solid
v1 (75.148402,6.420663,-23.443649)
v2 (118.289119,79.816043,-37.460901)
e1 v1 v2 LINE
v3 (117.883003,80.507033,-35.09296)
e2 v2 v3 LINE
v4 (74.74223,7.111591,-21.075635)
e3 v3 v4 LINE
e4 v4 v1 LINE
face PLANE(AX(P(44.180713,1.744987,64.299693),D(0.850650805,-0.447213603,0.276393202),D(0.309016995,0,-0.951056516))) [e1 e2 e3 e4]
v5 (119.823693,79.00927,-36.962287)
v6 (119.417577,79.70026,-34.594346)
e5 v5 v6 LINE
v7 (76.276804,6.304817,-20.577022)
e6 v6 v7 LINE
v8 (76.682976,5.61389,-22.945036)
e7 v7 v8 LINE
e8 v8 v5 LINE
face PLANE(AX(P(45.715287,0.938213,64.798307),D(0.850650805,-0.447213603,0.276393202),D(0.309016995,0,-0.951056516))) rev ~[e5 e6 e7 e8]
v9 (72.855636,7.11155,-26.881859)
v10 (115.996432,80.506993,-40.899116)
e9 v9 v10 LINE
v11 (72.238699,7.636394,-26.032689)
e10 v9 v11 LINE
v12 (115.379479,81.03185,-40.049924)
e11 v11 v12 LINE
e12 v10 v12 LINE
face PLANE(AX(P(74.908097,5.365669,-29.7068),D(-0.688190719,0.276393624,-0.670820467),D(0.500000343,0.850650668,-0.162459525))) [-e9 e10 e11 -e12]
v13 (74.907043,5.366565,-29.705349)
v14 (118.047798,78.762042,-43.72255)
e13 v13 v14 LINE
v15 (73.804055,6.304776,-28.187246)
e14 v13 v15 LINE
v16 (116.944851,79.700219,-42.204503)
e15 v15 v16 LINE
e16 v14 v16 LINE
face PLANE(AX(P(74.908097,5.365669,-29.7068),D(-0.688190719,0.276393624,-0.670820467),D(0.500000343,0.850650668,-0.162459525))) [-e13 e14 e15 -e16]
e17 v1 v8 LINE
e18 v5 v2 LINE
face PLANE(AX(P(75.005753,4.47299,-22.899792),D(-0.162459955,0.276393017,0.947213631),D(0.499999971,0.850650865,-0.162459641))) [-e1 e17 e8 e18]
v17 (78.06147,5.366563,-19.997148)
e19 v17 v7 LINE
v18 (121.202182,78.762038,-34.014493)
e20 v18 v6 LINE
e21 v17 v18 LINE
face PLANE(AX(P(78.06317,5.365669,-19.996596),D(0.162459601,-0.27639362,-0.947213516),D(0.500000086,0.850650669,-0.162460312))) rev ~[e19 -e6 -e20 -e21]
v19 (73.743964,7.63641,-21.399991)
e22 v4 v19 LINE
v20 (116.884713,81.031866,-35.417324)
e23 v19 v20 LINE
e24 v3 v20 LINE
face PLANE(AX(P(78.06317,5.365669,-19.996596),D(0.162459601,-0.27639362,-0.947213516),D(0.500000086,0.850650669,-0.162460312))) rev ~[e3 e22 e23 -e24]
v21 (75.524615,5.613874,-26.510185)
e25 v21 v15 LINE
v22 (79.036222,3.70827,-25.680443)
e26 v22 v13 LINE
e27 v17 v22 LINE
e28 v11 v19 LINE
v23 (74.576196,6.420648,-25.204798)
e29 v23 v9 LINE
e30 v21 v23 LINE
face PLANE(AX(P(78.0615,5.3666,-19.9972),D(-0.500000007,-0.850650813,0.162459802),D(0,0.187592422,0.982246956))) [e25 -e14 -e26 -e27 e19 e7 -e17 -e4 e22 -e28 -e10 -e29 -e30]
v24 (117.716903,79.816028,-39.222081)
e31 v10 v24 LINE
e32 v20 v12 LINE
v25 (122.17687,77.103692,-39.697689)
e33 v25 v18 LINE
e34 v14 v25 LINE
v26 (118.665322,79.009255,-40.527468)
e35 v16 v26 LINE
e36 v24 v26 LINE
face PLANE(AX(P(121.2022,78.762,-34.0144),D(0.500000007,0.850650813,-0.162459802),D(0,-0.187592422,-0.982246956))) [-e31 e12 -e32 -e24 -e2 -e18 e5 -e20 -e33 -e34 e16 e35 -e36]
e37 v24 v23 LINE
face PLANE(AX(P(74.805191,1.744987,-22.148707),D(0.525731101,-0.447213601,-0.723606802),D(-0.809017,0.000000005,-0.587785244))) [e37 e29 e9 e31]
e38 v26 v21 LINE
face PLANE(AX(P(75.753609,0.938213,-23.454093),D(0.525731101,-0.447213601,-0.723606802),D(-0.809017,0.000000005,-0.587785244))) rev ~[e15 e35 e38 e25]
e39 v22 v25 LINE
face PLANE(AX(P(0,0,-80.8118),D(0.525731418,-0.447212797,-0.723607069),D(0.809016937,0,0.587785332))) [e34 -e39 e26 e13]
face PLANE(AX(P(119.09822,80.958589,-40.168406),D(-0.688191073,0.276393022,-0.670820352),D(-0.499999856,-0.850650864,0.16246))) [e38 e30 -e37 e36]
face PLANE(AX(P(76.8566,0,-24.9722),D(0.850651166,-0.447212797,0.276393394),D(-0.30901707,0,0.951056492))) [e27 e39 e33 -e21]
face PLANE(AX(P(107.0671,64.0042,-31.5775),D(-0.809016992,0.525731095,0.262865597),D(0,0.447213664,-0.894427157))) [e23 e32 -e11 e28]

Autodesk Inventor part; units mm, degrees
sketch "Boceto1" plane through (0, 0, 0) normal (0, 1, 0) x (-1, 0, 0)
  line L0 (47.5, 65.3781) -> (76.8566, -24.9722)
  line L1 (76.8566, -24.9722) -> (0, -80.8118)
  line L2 (0, -80.8118) -> (-76.8566, -24.9722)
  line L3 (-76.8566, -24.9722) -> (-47.5, 65.3781)
  line L4 (-47.5, 65.3781) -> (47.5, 65.3781)
  line L5 (0, 0) -> (130.7563, 0) construction
  line L6 (130.7563, 0) -> (130.7563, 130.7563) construction
  line L7 (130.7563, 130.7563) -> (0, 130.7563) construction
  line L8 (0, 130.7563) -> (0, 0) construction
  line L9 (130.7563, 130.7563) -> (0, 65.3781)
  dimension "d0" = 95
  dimension "d1" = 211.5681
  dimension "d2" = 26.565
extrude "Extrusión1" add sketch "Boceto1" along normal blind 211.5681 draft 26.565
sketch "Boceto2" plane through (0, 211.5681, 0) normal (0, 1, 0) x (1, 0, 0)
  line L0 (0, -80.8118) -> (-76.8566, -24.9722)
  line L1 (-76.8566, -24.9722) -> (-47.5, 65.3781)
  line L2 (-47.5, 65.3781) -> (47.5, 65.3781)
  line L3 (47.5, 65.3781) -> (76.8566, -24.9722)
  line L4 (76.8566, -24.9722) -> (0, -80.8118)
  point P0 (0, 0)
  point P1 (0, 0)
  dimension "L" = 95
extrude "Extrusión2" cut sketch "Boceto2" against normal blind 211.5681 draft 26.565 keep common part
sketch "Boceto3" plane through (47.5, 0, 65.3781) normal (0.8506508, -0.4472136, 0.2763932) x (0.309017, 0, -0.9510565)
  line L0 (47.5, 146.19) -> (124.3566, 90.3504) projected
  line L1 (-29.3566, 90.3504) -> (47.5, 146.19) projected
  line L2 (0, 0) -> (-29.3566, 90.3504) projected
  line L3 (0, 0) -> (95, 0) projected
  line L4 (95, 0) -> (124.3566, 90.3504) projected
  line L5 (117.3032, 88.0586) -> (47.5, 138.7736)
  line L6 (47.5, 138.7736) -> (-22.3032, 88.0586)
  line L7 (-22.3032, 88.0586) -> (4.3593, 6)
  line L8 (4.3593, 6) -> (90.6407, 6)
  line L9 (90.6407, 6) -> (117.3032, 88.0586)
  point P0 (47.5, -29.238)
  dimension "D" = 6
extrude "Extrusión3" cut sketch "Boceto3" against normal blind 111.5681 contours L9 L8 L7 L6 L5
sketch "Boceto4" plane through (76.8566, 0, -24.9722) normal (0.5257311, -0.4472136, -0.7236068) x (-0.809017, 0, -0.5877853)
  line L0 (47.5, 146.19) -> (124.3566, 90.3504) projected
  line L1 (-29.3566, 90.3504) -> (47.5, 146.19) projected
  line L2 (0, 0) -> (-29.3566, 90.3504) projected
  line L3 (0, 0) -> (95, 0) projected
  line L4 (95, 0) -> (124.3566, 90.3504) projected
  line L5 (90.6407, 6) -> (4.3593, 6)
  line L6 (4.3593, 6) -> (-22.3032, 88.0586)
  line L7 (-22.3032, 88.0586) -> (47.5, 138.7736)
  line L8 (47.5, 138.7736) -> (117.3032, 88.0586)
  line L9 (117.3032, 88.0586) -> (90.6407, 6)
  point P0 (47.5, -29.238)
  dimension "d14" = 6
extrude "Extrusión4" cut sketch "Boceto4" against normal blind 111.5681 contours L5 L6 L7 L8 L9
sketch "Boceto5" plane through (0, 0, 0) normal (0, -1, 0) x (1, 0, 0)
  line L0 (76.8566, -24.9722) -> (0, -80.8118) projected
  line L1 (47.5, 65.3781) -> (76.8566, -24.9722) projected
  line L2 (-47.5, 65.3781) -> (47.5, 65.3781) projected
  line L3 (-76.8566, -24.9722) -> (-47.5, 65.3781) projected
  line L4 (0, -80.8118) -> (-76.8566, -24.9722) projected
  line L5 (43.1407, 59.3781) -> (69.8032, -22.6804)
  line L6 (69.8032, -22.6804) -> (0, -73.3954)
  line L7 (0, -73.3954) -> (-69.8032, -22.6804)
  line L8 (-69.8032, -22.6804) -> (-43.1407, 59.3781)
  line L9 (-43.1407, 59.3781) -> (43.1407, 59.3781)
  point P0 (0, 0)
  dimension "d17" = 6
extrude "Extrusión5" cut sketch "Boceto5" against normal blind 111.5681 contours L5 L6 L7 L8 L9
sketch "Boceto6" plane through (47.5, 211.5681, -65.3781) normal (0, 0.4472136, -0.8944272) x (-1, 0, 0)
  line L0 (47.5, -146.19) -> (124.3566, -90.3504) projected
  line L1 (95, 0) -> (124.3566, -90.3504) projected
  line L2 (95, 0) -> (0, 0) projected
  line L3 (0, 0) -> (-29.3566, -90.3504) projected
  line L4 (-29.3566, -90.3504) -> (47.5, -146.19) projected
  line L5 (117.3032, -88.0586) -> (47.5, -138.7736)
  line L6 (47.5, -138.7736) -> (-22.3032, -88.0586)
  line L7 (-22.3032, -88.0586) -> (4.3593, -6)
  line L8 (4.3593, -6) -> (90.6407, -6)
  line L9 (90.6407, -6) -> (117.3032, -88.0586)
  point P0 (47.5, -159.9943)
  dimension "d20" = 6
extrude "Extrusión6" cut sketch "Boceto6" against normal blind 111.5681 contours L5 L6 L7 L8 L9
sketch "Boceto7" plane through (0, 0, -80.8118) normal (-0.5257311, -0.4472136, -0.7236068) x (-0.809017, 0, 0.5877853)
  line L0 (47.5, 146.19) -> (124.3566, 90.3504) projected
  line L1 (-29.3566, 90.3504) -> (47.5, 146.19) projected
  line L2 (0, 0) -> (-29.3566, 90.3504) projected
  line L3 (0, 0) -> (95, 0) projected
  line L4 (95, 0) -> (124.3566, 90.3504) projected
  line L5 (117.3032, 88.0586) -> (47.5, 138.7736)
  line L6 (47.5, 138.7736) -> (-22.3032, 88.0586)
  line L7 (-22.3032, 88.0586) -> (4.3593, 6)
  line L8 (4.3593, 6) -> (90.6407, 6)
  line L9 (90.6407, 6) -> (117.3032, 88.0586)
  point P0 (47.5, -29.238)
  dimension "d23" = 6
extrude "Extrusión7" cut sketch "Boceto7" against normal blind 111.5681 contours L9 L8 L7 L6 L5
sketch "Boceto8" plane through (76.8566, 211.5681, 24.9722) normal (0.8506508, 0.4472136, -0.2763932) x (-0.309017, 0, -0.9510565)
  line L0 (47.5, -146.19) -> (124.3566, -90.3504) projected
  line L1 (95, 0) -> (124.3566, -90.3504) projected
  line L2 (95, 0) -> (0, 0) projected
  line L3 (0, 0) -> (-29.3566, -90.3504) projected
  line L4 (-29.3566, -90.3504) -> (47.5, -146.19) projected
  line L5 (47.5, -138.7736) -> (117.3032, -88.0586)
  line L6 (117.3032, -88.0586) -> (90.6407, -6)
  line L7 (90.6407, -6) -> (4.3593, -6)
  line L8 (4.3593, -6) -> (-22.3032, -88.0586)
  line L9 (-22.3032, -88.0586) -> (47.5, -138.7736)
  point P0 (47.5, -159.9943)
  dimension "d26" = 6
extrude "Extrusión8" cut sketch "Boceto8" against normal blind 111.5681 contours L9 L8 L7 L6 L5
sketch "Boceto9" plane through (0, 211.5681, 0) normal (0, 1, 0) x (1, 0, 0)
  line L0 (78.0615, -19.9972) -> (-16.844, -50.8338) projected
  line L1 (-47.5, 65.3781) -> (47.5, 65.3781) projected
  line L2 (-76.8566, -24.9722) -> (-47.5, 65.3781) projected
  line L3 (0, -80.8118) -> (-76.8566, -24.9722) projected
  line L4 (76.8566, -24.9722) -> (0, -80.8118) projected
  line L5 (47.5, 65.3781) -> (76.8566, -24.9722) projected
  line L6 (0, -73.3954) -> (-69.8032, -22.6804)
  line L7 (-69.8032, -22.6804) -> (-43.1407, 59.3781)
  line L8 (-43.1407, 59.3781) -> (43.1407, 59.3781)
  line L9 (43.1407, 59.3781) -> (69.8032, -22.6804)
  line L10 (69.8032, -22.6804) -> (0, -73.3954)
  point P0 (0, 0)
  dimension "d29" = 6
extrude "Extrusión9" cut sketch "Boceto9" against normal blind 111.5681 contours L6 L7 L8 L9 L10
sketch "Boceto10" plane through (-47.5, 211.5681, -65.3781) normal (-0.8506508, 0.4472136, -0.2763932) x (-0.309017, 0, 0.9510565)
  line L0 (-29.3566, -90.3504) -> (47.5, -146.19) projected
  line L1 (47.5, -146.19) -> (124.3566, -90.3504) projected
  line L2 (95, 0) -> (124.3566, -90.3504) projected
  line L3 (95, 0) -> (0, 0) projected
  line L4 (0, 0) -> (-29.3566, -90.3504) projected
  line L5 (117.3032, -88.0586) -> (47.5, -138.7736)
  line L6 (47.5, -138.7736) -> (-22.3032, -88.0586)
  line L7 (-22.3032, -88.0586) -> (4.3593, -6)
  line L8 (4.3593, -6) -> (90.6407, -6)
  line L9 (90.6407, -6) -> (117.3032, -88.0586)
  point P0 (47.5, -159.9943)
  dimension "d32" = 6
extrude "Extrusión10" cut sketch "Boceto10" against normal blind 111.5681 contours L5 L6 L7 L8 L9
sketch "Boceto11" plane through (-76.8566, 0, -24.9722) normal (-0.8506508, -0.4472136, 0.2763932) x (0.309017, 0, 0.9510565)
  line L0 (47.5, 65.3781) -> (90.6407, 79.3954) projected
  line L1 (-29.3566, 90.3504) -> (47.5, 146.19) projected
  line L2 (0, 0) -> (-29.3566, 90.3504) projected
  line L3 (0, 0) -> (95, 0) projected
  line L4 (95, 0) -> (124.3566, 90.3504) projected
  line L5 (47.5, 146.19) -> (124.3566, 90.3504) projected
  line L6 (117.3032, 88.0586) -> (90.6407, 6)
  line L7 (90.6407, 6) -> (4.3593, 6)
  line L8 (4.3593, 6) -> (-22.3032, 88.0586)
  line L9 (-22.3032, 88.0586) -> (47.5, 138.7736)
  line L10 (47.5, 138.7736) -> (117.3032, 88.0586)
  point P0 (47.5, -29.238)
  dimension "d35" = 6
extrude "Extrusión11" cut sketch "Boceto11" against normal blind 111.5681 contours L6 L7 L8 L9 L10
sketch "Boceto12" plane through (-47.5, 0, 65.3781) normal (0, -0.4472136, 0.8944272) x (1, 0, 0)
  line L0 (4.3593, 6) -> (47.5, 65.3781) projected
  line L1 (-29.3566, 90.3504) -> (47.5, 146.19) projected
  line L2 (0, 0) -> (-29.3566, 90.3504) projected
  line L3 (0, 0) -> (95, 0) projected
  line L4 (95, 0) -> (124.3566, 90.3504) projected
  line L5 (47.5, 146.19) -> (124.3566, 90.3504) projected
  line L6 (117.3032, 88.0586) -> (90.6407, 6)
  line L7 (90.6407, 6) -> (4.3593, 6)
  line L8 (4.3593, 6) -> (-22.3032, 88.0586)
  line L9 (-22.3032, 88.0586) -> (47.5, 138.7736)
  line L10 (47.5, 138.7736) -> (117.3032, 88.0586)
  point P0 (47.5, -29.238)
  dimension "d38" = 6
extrude "Extrusión12" cut sketch "Boceto12" against normal blind 111.5681 contours L6 L7 L8 L9 L10
sketch "Boceto13" plane through (0, 211.5681, 80.8118) normal (0.5257311, 0.4472136, 0.7236068) x (0.809017, 0, -0.5877853)
  line L0 (-29.3566, -90.3504) -> (47.5, -146.19) projected
  line L1 (47.5, -146.19) -> (124.3566, -90.3504) projected
  line L2 (95, 0) -> (124.3566, -90.3504) projected
  line L3 (95, 0) -> (0, 0) projected
  line L4 (0, 0) -> (-29.3566, -90.3504) projected
  line L5 (47.5, -138.7736) -> (-22.3032, -88.0586)
  line L6 (-22.3032, -88.0586) -> (4.3593, -6)
  line L7 (4.3593, -6) -> (90.6407, -6)
  line L8 (90.6407, -6) -> (117.3032, -88.0586)
  line L9 (117.3032, -88.0586) -> (47.5, -138.7736)
  point P0 (47.5, -159.9943)
  dimension "d41" = 6
extrude "Extrusión13" cut sketch "Boceto13" against normal blind 111.5681 contours L5 L6 L7 L8 L9
sketch "Boceto14" plane through (-76.8566, 211.5681, 24.9722) normal (-0.5257311, 0.4472136, 0.7236068) x (0.809017, 0, 0.5877853)
  line L0 (-29.3566, -90.3504) -> (47.5, -146.19) projected
  line L1 (47.5, -146.19) -> (124.3566, -90.3504) projected
  line L2 (95, 0) -> (124.3566, -90.3504) projected
  line L3 (95, 0) -> (0, 0) projected
  line L4 (0, 0) -> (-29.3566, -90.3504) projected
  line L5 (-22.3032, -88.0586) -> (47.5, -138.7736)
  line L6 (47.5, -138.7736) -> (117.3032, -88.0586)
  line L7 (117.3032, -88.0586) -> (90.6407, -6)
  line L8 (90.6407, -6) -> (4.3593, -6)
  line L9 (4.3593, -6) -> (-22.3032, -88.0586)
  point P0 (47.5, -159.9943)
  dimension "d44" = 6
extrude "Extrusión14" cut sketch "Boceto14" against normal blind 111.5681 contours L9 L8 L7 L6 L5
ref_plane "Plano de trabajo1" through (47.5, 210.2265, -62.6949) normal (0, 0.4472136, -0.8944272) x (-1, 0, 0)
sketch "Boceto15" plane through (47.5, 210.2265, -62.6949) normal (0, 0.4472136, -0.8944272) x (-1, 0, 0)
  line L0 (4.3593, -6) -> (90.6407, -6) projected
  line L1 (-22.3032, -88.0586) -> (4.3593, -6) projected
  line L2 (47.5, -138.7736) -> (-22.3032, -88.0586) projected
  line L3 (117.3032, -88.0586) -> (47.5, -138.7736) projected
  line L4 (90.6407, -6) -> (117.3032, -88.0586) projected
  line L5 (2.5429, -3.5) -> (92.4571, -3.5)
  line L6 (92.4571, -3.5) -> (120.2421, -89.0135)
  line L7 (120.2421, -89.0135) -> (47.5, -141.8637)
  line L8 (47.5, -141.8637) -> (-25.2421, -89.0135)
  line L9 (-25.2421, -89.0135) -> (2.5429, -3.5)
  point P0 (47.5, -159.9943)
  dimension "D2" = 2.5
extrude "Extrusión15" cut sketch "Boceto15" along normal mid plane 1.8 contours L0 L4 L3 L2 L1 | L5 L6 L7 L8 L9
ref_plane "Plano de trabajo2" through (75.2794, 1.3416, -22.8014) normal (0.5257311, -0.4472136, -0.7236068) x (-0.809017, 0, -0.5877853)
sketch "Boceto16" plane through (75.2794, 1.3416, -22.8014) normal (0.5257311, -0.4472136, -0.7236068) x (-0.809017, 0, -0.5877853)
  line L0 (90.6407, 6) -> (4.3593, 6) projected
  line L1 (117.3032, 88.0586) -> (90.6407, 6) projected
  line L2 (47.5, 138.7736) -> (117.3032, 88.0586) projected
  line L3 (-22.3032, 88.0586) -> (47.5, 138.7736) projected
  line L4 (4.3593, 6) -> (-22.3032, 88.0586) projected
  line L5 (2.5429, 3.5) -> (92.4571, 3.5)
  line L6 (92.4571, 3.5) -> (120.2421, 89.0135)
  line L7 (120.2421, 89.0135) -> (47.5, 141.8637)
  line L8 (47.5, 141.8637) -> (-25.2421, 89.0135)
  line L9 (-25.2421, 89.0135) -> (2.5429, 3.5)
  point P0 (47.5, -29.238)
  dimension "d52" = 2.5
extrude "Extrusión16" cut sketch "Boceto16" along normal mid plane 1.8
ref_plane "Plano de trabajo3" through (74.3047, 210.2265, 25.8014) normal (0.8506508, 0.4472136, -0.2763932) x (-0.309017, 0, -0.9510565)
sketch "Boceto17" plane through (74.3047, 210.2265, 25.8014) normal (0.8506508, 0.4472136, -0.2763932) x (-0.309017, 0, -0.9510565)
  line L0 (47.5, -138.7736) -> (-22.3032, -88.0586) projected
  line L1 (117.3032, -88.0586) -> (47.5, -138.7736) projected
  line L2 (90.6407, -6) -> (117.3032, -88.0586) projected
  line L3 (4.3593, -6) -> (90.6407, -6) projected
  line L4 (-22.3032, -88.0586) -> (4.3593, -6) projected
  line L5 (-25.2421, -89.0135) -> (47.5, -141.8637)
  line L6 (47.5, -141.8637) -> (120.2421, -89.0135)
  line L7 (120.2421, -89.0135) -> (92.4571, -3.5)
  line L8 (92.4571, -3.5) -> (2.5429, -3.5)
  line L9 (2.5429, -3.5) -> (-25.2421, -89.0135)
  point P0 (47.5, -159.9943)
  dimension "d56" = 2.5
extrude "Extrusión17" cut sketch "Boceto17" along normal mid plane 1.8
ref_plane "Plano de trabajo4" through (1.5772, 1.3416, -78.641) normal (-0.5257311, -0.4472136, -0.7236068) x (-0.809017, 0, 0.5877853)
sketch "Boceto18" plane through (1.5772, 1.3416, -78.641) normal (-0.5257311, -0.4472136, -0.7236068) x (-0.809017, 0, 0.5877853)
  line L0 (117.3032, 88.0586) -> (90.6407, 6) projected
  line L1 (47.5, 138.7736) -> (117.3032, 88.0586) projected
  line L2 (-22.3032, 88.0586) -> (47.5, 138.7736) projected
  line L3 (4.3593, 6) -> (-22.3032, 88.0586) projected
  line L4 (90.6407, 6) -> (4.3593, 6) projected
  line L5 (92.4571, 3.5) -> (120.2421, 89.0135)
  line L6 (120.2421, 89.0135) -> (47.5, 141.8637)
  line L7 (47.5, 141.8637) -> (-25.2421, 89.0135)
  line L8 (-25.2421, 89.0135) -> (2.5429, 3.5)
  line L9 (2.5429, 3.5) -> (92.4571, 3.5)
  point P0 (47.5, -29.238)
  dimension "d60" = 2.5
extrude "Extrusión18" cut sketch "Boceto18" along normal mid plane 1.8 contours L0 L4 L3 L2 L1 | L9 L8 L7 L6 L5
ref_plane "Plano de trabajo5" through (0, 3, 0) normal (0, -1, 0) x (1, 0, 0)
sketch "Boceto19" plane through (0, 3, 0) normal (0, -1, 0) x (1, 0, 0)
  line L0 (0, -73.3954) -> (-69.8032, -22.6804) projected
  line L1 (-69.8032, -22.6804) -> (-43.1407, 59.3781) projected
  line L2 (-43.1407, 59.3781) -> (43.1407, 59.3781) projected
  line L3 (43.1407, 59.3781) -> (69.8032, -22.6804) projected
  line L4 (69.8032, -22.6804) -> (0, -73.3954) projected
  line L5 (76.8566, -24.9722) -> (0, -80.8118) projected
  line L6 (47.5, 65.3781) -> (76.8566, -24.9722) projected
  line L7 (-47.5, 65.3781) -> (47.5, 65.3781) projected
  line L8 (-76.8566, -24.9722) -> (-47.5, 65.3781) projected
  line L9 (0, -80.8118) -> (-76.8566, -24.9722) projected
  line L10 (-44.9571, 61.8781) -> (-72.7421, -23.6353)
  line L11 (-72.7421, -23.6353) -> (0, -76.4856)
  line L12 (0, -76.4856) -> (72.7421, -23.6353)
  line L13 (72.7421, -23.6353) -> (44.9571, 61.8781)
  line L14 (44.9571, 61.8781) -> (-44.9571, 61.8781)
  point P0 (0, 0)
  dimension "d64" = 2.5
extrude "Extrusión19" cut sketch "Boceto19" along normal mid plane 1.8 contours L0 L1 L2 L3 L4 | L14 L13 L12 L11 L10
ref_plane "Plano de trabajo6" through (44.948, 1.3416, 64.549) normal (0.8506508, -0.4472136, 0.2763932) x (0.309017, 0, -0.9510565)
sketch "Boceto20" plane through (44.948, 1.3416, 64.549) normal (0.8506508, -0.4472136, 0.2763932) x (0.309017, 0, -0.9510565)
  line L0 (4.3593, 6) -> (-22.3032, 88.0586) projected
  line L1 (-22.3032, 88.0586) -> (47.5, 138.7736) projected
  line L2 (47.5, 138.7736) -> (117.3032, 88.0586) projected
  line L3 (117.3032, 88.0586) -> (90.6407, 6) projected
  line L4 (90.6407, 6) -> (4.3593, 6) projected
  line L5 (47.5, 146.19) -> (124.3566, 90.3504) projected
  line L6 (-29.3566, 90.3504) -> (47.5, 146.19) projected
  line L7 (0, 0) -> (-29.3566, 90.3504) projected
  line L8 (0, 0) -> (95, 0) projected
  line L9 (95, 0) -> (124.3566, 90.3504) projected
  line L10 (-25.2421, 89.0135) -> (2.5429, 3.5)
  line L11 (2.5429, 3.5) -> (92.4571, 3.5)
  line L12 (92.4571, 3.5) -> (120.2421, 89.0135)
  line L13 (120.2421, 89.0135) -> (47.5, 141.8637)
  line L14 (47.5, 141.8637) -> (-25.2421, 89.0135)
  point P0 (47.5, -29.238)
  dimension "d68" = 2.5
extrude "Extrusión20" cut sketch "Boceto20" along normal mid plane 1.8 contours L0 L1 L2 L3 L4 | L14 L13 L12 L11 L10
ref_plane "Plano de trabajo7" through (121.2022, 87.4453, -39.381) normal (-0.309017, 0, -0.9510565) x (-0.8506508, -0.4472136, 0.2763932)
split body "Dividir1" result two bodies by plane through (121.2022, 87.4453, -39.381) normal (-0.309017, 0, -0.9510565) first body at (-25.6189, 99.4475, -120.8794)
ref_plane "Plano de trabajo8" through (118.0478, 78.762, -43.7226) normal (0, -0.8506508, 0.5257311) x (-0.5257311, 0.4472136, 0.7236068)
split "Dividir2" plane through (118.0478, 78.762, -43.7226) removes the side toward (0, 0.8506508, -0.5257311)
ref_plane "Plano de trabajo9" through (121.2022, 78.762, -34.0144) normal (-0.309017, -0.8506508, -0.4253254) x (-0.8506508, 0.4472136, -0.2763932)
split "Dividir3" plane through (121.2022, 78.762, -34.0144) removes the side toward (0.309017, 0.8506508, 0.4253254)
ref_plane "Plano de trabajo13" through (34.9016, 9.7082, -48.0379) normal (-0.5, -0.5257311, 0.688191) x (0.809017, 0, 0.5877853)
split "Dividir7" plane through (34.9016, 9.7082, -48.0379) removes the side toward (-0.5, -0.5257311, 0.688191)
ref_plane "Plano de trabajo14" through (74.9071, 5.3666, -29.7054) normal (-0.809017, -0.5257311, -0.2628656) x (-0.5257311, 0.4472136, 0.7236068)
split "Dividir8" plane through (74.9071, 5.3666, -29.7054) removes the side toward (-0.809017, -0.5257311, -0.2628656)
ref_plane "Plano de trabajo16" through (107.0671, 64.0042, -31.5775) normal (-0.809017, 0.5257311, 0.2628656) x (0.5, 0.8506508, -0.1624598)
ref_plane "Plano de trabajo15" through (107.8761, 63.4785, -31.8404) normal (-0.809017, 0.5257311, 0.2628656) x (0.5, 0.8506508, -0.1624598)
combine bodies "Combinar1" operation type add bodies to combine 2 3
split "Dividir9" plane through (107.0671, 64.0042, -31.5775) removes the side toward (-0.809017, 0.5257311, 0.2628656)
ref_plane "Plano de trabajo17" through (78.0615, 5.3666, -19.9972) normal (-0.1624598, 0.2763932, 0.9472136) x (0.8506508, -0.4472136, 0.2763932)
split "Dividir10" plane through (78.0615, 5.3666, -19.9972) removes the side toward (-0.1624598, 0.2763932, 0.9472136)
sketch "Boceto23" plane through (76.8566, 0, -24.9722) normal (-0.809017, -0.5257311, -0.2628656) x (-0.5257311, 0.4472136, 0.7236068)
  line L0 (6.356, 4.8556) -> (5.0756, 7.4164) projected
  line L1 (3.9, 7.4164) -> (5.0756, 7.4164) projected
  line L2 (3.9, 4.3262) -> (3.9, 7.4164) projected
  line L3 (3.9, 4.3262) -> (2.1, 4.3262) projected
  line L4 (2.1, 7.4164) -> (2.1, 4.3262) projected
  line L5 (0, 7.4164) -> (2.1, 7.4164) projected
  line L6 (0, 0) -> (0, 7.4164) projected
  line L7 (0, 0) -> (6.356, 4.8556) projected
  line L8 (0, 7.4164) -> (0.78, 7.4164)
  line L9 (0, 7.4164) -> (2.1, 7.4164) projected
  line L10 (0.78, 7.4164) -> (1.28, 7.4164)
  line L11 (1.28, 7.4164) -> (0.78, 7.4164)
  line L12 (0.78, 7.4164) -> (0.78, 2.4164)
  line L13 (0.78, 2.4164) -> (1.28, 2.4164)
  line L14 (1.28, 2.4164) -> (1.28, 7.4164)
  point P0 (58.476, 4.2658)
  point P1 (1.28, 7.4164)
  point P2 (0.78, 7.4164)
  dimension "d91" = 0.78
  dimension "d92" = 0.5
  dimension "d93" = 5
extrude "Extrusión23" add sketch "Boceto23" along normal blind 0.7 contours L5 L14 L13 L12 bodies 3
chamfer "Chaflán3" distance 0.7 angle 45 2 edges at (75.1542, 3.9064, -27.5454) (74.8913, 4.13, -27.1836)
ref_plane "Plano de trabajo18" through (73.8031, 6.3057, -28.1858) normal (-0.688191, 0.2763932, -0.6708204) x (-0.5257311, 0.4472136, 0.7236068)
split "Dividir11" plane through (73.8031, 6.3057, -28.1858) removes the side toward (-0.688191, 0.2763932, -0.6708204)
ref_plane "Plano de trabajo19" through (121.2022, 78.762, -34.0144) normal (0.5, 0.8506508, -0.1624598) x (-0.8506508, 0.4472136, -0.2763932)
ref_plane "Plano de trabajo20" through (78.0615, 5.3666, -19.9972) normal (0.5, 0.8506508, -0.1624598) x (-0.8506508, 0.4472136, -0.2763932)
split "Dividir12" plane through (78.0615, 5.3666, -19.9972) removes the side toward (-0.5, -0.8506508, 0.1624598)
split "Dividir13" plane through (121.2022, 78.762, -34.0144) removes the side toward (0.5, 0.8506508, -0.1624598)
equation "\"d0\" = L"
equation "\"d3\" = d1"
equation "\"d4\" = d2"
equation "\"d6\" = d1"
equation "\"d7\" = d2"
equation "\"d14\" = D"
equation "\"d17\" = D"
equation "\"d20\" = D"
equation "\"d23\" = D"
equation "\"d26\" = D"
equation "\"d29\" = D"
equation "\"d32\" = D"
equation "\"d35\" = D"
equation "\"d38\" = D"
equation "\"d41\" = D"
equation "\"d44\" = D"
equation "\"d48\" = ESP"
equation "\"d52\" = D2"
equation "\"d56\" = D2"
equation "\"d57\" = ESP"
equation "\"d60\" = D2"
equation "\"d61\" = ESP"
equation "\"d64\" = D2"
equation "\"d65\" = ESP"
equation "\"d68\" = D2"
equation "\"d69\" = ESP"
equation "\"d51\" = P"
equation "\"d55\" = P"
equation "\"d59\" = P"
equation "\"d63\" = P"
equation "\"d67\" = P"
equation "\"ESP\" = 1.8"
equation "\"P\" = -3"
properties part number "Perfil"
